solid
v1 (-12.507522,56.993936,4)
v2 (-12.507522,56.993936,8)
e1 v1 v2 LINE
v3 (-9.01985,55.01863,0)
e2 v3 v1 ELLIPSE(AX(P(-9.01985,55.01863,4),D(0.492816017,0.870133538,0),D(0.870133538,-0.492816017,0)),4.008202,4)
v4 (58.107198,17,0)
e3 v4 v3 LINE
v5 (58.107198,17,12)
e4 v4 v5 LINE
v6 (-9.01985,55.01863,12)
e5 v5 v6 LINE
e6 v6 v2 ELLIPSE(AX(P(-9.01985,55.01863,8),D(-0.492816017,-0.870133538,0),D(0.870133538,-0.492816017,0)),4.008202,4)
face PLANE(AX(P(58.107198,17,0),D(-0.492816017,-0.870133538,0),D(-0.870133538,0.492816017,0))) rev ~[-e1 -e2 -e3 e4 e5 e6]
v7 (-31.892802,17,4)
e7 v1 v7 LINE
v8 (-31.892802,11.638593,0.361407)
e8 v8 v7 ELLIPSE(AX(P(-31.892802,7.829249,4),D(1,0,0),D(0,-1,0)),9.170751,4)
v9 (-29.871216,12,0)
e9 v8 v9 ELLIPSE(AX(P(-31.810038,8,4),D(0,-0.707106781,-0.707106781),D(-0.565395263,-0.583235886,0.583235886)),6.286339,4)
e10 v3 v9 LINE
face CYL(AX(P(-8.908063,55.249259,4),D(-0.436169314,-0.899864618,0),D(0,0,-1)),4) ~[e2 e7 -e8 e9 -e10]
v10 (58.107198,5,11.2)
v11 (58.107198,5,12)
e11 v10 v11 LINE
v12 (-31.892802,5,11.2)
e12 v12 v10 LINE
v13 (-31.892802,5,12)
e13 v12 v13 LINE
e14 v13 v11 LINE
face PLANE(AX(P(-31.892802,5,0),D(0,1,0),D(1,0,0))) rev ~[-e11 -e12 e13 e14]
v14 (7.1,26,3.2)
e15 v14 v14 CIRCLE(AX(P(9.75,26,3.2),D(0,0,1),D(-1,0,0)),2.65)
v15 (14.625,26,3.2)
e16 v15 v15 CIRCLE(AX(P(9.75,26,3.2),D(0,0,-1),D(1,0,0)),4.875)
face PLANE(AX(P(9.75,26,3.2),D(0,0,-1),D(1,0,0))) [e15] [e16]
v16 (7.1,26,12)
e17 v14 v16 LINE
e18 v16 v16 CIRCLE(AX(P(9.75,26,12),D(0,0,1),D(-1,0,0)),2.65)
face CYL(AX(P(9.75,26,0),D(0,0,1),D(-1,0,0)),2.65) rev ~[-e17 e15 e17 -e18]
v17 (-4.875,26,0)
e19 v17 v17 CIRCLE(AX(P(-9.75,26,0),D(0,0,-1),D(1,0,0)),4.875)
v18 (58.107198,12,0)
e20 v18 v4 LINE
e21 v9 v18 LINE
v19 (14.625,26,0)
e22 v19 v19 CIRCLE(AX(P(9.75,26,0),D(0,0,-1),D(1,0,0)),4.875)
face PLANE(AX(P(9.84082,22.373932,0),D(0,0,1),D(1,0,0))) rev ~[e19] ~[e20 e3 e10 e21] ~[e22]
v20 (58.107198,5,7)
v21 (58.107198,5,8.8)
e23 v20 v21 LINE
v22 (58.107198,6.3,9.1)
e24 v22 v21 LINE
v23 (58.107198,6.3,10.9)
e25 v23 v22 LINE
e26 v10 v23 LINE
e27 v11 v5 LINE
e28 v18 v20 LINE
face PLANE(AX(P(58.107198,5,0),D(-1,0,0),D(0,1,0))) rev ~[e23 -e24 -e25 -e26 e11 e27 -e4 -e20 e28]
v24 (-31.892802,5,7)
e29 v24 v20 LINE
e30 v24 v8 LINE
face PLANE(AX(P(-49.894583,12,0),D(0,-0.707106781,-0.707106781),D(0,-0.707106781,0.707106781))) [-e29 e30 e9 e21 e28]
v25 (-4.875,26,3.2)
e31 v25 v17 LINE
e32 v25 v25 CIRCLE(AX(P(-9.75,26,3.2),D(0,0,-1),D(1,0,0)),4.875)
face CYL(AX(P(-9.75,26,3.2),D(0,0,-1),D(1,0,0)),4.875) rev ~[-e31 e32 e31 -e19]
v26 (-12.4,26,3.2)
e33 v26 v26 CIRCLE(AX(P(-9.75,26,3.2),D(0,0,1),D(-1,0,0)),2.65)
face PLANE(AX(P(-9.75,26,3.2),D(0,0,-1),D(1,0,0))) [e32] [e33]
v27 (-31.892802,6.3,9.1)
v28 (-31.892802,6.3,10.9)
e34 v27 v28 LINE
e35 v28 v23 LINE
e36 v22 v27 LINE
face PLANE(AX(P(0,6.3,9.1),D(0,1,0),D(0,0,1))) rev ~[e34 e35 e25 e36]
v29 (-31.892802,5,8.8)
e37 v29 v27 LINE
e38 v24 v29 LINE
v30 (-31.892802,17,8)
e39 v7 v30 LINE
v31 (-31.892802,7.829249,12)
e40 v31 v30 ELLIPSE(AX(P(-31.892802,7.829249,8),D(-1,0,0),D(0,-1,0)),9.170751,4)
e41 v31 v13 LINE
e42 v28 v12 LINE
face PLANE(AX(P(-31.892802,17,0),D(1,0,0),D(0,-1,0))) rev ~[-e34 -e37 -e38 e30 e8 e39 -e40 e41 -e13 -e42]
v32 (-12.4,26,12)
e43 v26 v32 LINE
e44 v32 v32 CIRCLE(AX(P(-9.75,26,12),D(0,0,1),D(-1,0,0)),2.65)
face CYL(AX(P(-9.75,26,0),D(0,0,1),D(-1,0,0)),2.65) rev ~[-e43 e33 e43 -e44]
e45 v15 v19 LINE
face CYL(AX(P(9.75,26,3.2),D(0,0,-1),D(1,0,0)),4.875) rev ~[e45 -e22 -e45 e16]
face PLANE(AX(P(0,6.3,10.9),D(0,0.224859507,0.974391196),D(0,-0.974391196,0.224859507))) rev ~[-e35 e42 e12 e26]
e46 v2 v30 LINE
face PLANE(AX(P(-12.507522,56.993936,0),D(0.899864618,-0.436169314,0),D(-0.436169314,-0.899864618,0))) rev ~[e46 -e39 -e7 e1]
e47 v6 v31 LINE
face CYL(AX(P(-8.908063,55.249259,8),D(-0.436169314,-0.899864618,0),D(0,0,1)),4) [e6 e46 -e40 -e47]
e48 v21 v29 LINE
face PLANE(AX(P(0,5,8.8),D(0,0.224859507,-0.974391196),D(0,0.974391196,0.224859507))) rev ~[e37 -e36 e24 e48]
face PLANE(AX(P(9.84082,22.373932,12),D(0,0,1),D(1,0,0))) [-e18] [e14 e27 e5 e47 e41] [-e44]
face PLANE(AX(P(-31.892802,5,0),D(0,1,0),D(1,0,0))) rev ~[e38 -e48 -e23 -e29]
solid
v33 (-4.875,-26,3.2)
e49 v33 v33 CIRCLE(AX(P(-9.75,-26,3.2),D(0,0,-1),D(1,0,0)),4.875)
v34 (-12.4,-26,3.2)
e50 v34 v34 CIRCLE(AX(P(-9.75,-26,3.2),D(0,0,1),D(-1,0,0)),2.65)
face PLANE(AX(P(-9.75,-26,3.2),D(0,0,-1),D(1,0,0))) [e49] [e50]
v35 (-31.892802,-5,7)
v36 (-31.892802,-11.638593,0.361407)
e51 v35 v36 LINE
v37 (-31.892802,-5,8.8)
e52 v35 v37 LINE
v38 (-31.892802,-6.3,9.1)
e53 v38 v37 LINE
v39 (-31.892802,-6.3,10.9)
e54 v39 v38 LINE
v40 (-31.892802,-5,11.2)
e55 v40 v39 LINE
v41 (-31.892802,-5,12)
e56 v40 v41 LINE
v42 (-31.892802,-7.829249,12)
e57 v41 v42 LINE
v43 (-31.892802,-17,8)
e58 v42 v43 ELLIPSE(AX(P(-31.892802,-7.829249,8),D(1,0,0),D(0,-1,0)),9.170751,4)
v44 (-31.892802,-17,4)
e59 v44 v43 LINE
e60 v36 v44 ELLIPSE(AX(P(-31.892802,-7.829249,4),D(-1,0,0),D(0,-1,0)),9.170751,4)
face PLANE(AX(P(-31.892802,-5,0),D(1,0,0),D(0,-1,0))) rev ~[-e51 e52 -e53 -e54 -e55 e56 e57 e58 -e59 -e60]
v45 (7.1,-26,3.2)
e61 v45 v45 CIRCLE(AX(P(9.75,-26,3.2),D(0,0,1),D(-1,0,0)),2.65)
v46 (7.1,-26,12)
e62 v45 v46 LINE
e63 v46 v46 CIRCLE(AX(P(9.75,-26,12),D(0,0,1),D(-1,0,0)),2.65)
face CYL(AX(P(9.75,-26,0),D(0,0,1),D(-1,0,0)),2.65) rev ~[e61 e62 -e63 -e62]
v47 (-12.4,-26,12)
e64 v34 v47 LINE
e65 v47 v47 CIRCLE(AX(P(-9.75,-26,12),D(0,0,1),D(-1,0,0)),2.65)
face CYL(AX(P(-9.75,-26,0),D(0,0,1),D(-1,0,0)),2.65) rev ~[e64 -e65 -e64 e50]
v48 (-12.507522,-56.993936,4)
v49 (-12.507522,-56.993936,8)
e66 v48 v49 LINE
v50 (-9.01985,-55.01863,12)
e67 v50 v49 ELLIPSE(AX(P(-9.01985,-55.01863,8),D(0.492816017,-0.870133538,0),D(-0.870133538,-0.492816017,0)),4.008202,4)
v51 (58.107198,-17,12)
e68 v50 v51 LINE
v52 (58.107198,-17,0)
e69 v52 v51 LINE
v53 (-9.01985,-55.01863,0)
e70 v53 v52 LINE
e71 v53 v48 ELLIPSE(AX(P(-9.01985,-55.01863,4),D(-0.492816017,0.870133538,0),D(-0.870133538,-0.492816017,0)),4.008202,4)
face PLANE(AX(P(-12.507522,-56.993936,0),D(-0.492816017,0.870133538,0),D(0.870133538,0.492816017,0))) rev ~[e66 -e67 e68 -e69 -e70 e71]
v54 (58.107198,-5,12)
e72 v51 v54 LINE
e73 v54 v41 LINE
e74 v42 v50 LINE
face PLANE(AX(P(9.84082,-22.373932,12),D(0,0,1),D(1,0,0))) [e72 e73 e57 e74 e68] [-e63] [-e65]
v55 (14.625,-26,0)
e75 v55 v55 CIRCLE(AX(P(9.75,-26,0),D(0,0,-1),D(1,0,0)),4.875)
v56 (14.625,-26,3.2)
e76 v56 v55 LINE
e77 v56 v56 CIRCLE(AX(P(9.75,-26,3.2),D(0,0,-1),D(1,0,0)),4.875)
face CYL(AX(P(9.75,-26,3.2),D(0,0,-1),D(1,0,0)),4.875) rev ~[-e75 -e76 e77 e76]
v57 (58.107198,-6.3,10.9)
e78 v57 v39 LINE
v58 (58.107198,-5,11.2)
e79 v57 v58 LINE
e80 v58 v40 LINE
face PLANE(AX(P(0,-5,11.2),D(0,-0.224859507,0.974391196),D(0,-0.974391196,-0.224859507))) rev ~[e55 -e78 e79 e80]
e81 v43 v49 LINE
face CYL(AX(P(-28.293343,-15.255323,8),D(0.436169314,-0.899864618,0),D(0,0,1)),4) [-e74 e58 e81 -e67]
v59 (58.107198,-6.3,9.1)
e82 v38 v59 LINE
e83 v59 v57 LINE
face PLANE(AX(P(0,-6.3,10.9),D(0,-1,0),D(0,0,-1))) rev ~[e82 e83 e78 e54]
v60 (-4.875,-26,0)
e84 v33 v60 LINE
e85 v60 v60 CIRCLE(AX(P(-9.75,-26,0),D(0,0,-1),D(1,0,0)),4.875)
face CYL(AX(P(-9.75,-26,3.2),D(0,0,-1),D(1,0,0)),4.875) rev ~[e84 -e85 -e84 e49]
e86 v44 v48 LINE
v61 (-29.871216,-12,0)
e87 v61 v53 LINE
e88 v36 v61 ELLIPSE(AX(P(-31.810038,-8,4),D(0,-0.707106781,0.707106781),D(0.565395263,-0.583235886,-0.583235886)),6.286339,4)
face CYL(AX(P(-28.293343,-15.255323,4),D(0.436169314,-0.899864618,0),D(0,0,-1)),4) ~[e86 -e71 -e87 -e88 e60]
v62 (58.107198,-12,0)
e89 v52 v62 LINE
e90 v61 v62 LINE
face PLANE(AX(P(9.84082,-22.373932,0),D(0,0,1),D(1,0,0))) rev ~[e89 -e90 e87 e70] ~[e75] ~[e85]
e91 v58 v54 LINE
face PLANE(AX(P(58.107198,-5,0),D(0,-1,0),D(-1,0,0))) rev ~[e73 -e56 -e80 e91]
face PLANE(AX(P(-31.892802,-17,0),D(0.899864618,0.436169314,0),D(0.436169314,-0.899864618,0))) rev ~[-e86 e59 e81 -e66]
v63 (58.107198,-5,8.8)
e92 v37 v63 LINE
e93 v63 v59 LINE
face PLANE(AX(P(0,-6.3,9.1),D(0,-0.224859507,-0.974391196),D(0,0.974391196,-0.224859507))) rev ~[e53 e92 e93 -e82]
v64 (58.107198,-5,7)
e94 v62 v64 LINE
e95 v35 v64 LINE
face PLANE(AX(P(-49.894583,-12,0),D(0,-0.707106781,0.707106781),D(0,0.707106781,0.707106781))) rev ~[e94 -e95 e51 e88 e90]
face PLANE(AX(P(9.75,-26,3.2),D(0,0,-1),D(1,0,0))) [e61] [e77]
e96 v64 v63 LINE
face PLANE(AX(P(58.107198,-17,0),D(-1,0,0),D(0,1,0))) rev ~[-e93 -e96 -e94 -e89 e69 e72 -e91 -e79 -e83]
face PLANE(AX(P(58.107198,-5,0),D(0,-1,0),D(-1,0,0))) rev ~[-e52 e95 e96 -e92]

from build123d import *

# Parameters (mm, degrees)
F2_DEPTH         = 12
F3_D             = 5.3
F3_CBORE_D       = 9.75
F3_CBORE_DEPTH   = 3.2
F3_2_D           = 5.3
F3_2_CBORE_D     = 9.75
F3_2_CBORE_DEPTH = 3.2
F5_DEPTH         = 58.1081982567
F5_DEPTH_BACK    = 31.8938017433
F6_R             = 4
F6_2_R           = 4
F7_T1_DEPTH      = 126.0035618315
F7_2_T1_DEPTH    = 126.0035618315


# Not quite as in the source:
# - a fillet or chamfer that OpenCascade refuses, or shapes differently, is made with other operations: its cross-section is extruded or revolved along the edge and cut away or added
# - a feature names something its author has since deleted; it is built from what else it names


with BuildPart() as f2:
    # F1 (on Top) → F2 (new body)
    with BuildSketch(Plane.XY):
        Polygon((-31.8928017433, 17), (-31.8928017433, 5), (58.1071982567, 5), (58.1071982567, 17), (-12.5075216938, 56.9939360137), align=None)
    extrude(amount=F2_DEPTH)

    # F3 (through all)
    with Locations(Plane(origin=(0, 0, 0), x_dir=(1, 0, 0), z_dir=(0, 0, -1))):
        with Locations((-9.75, -26), (9.75, -26), (-9.75, 26), (9.75, 26)):
            CounterBoreHole(F3_D / 2, F3_CBORE_D / 2, F3_CBORE_DEPTH)


with BuildPart() as f2b:
    # F1 (on Top) → F2, piece 2 (new body)
    with BuildSketch(Plane.XY):
        Polygon((58.1071982567, -17), (58.1071982567, -5), (-31.8928017433, -5), (-31.8928017433, -17), (-12.5075216938, -56.9939360137), align=None)
    extrude(amount=F2_DEPTH)

    # F3#2 (through all)
    with Locations(Plane(origin=(0, 0, 0), x_dir=(1, 0, 0), z_dir=(0, 0, -1))):
        with Locations((-9.75, -26), (9.75, -26), (-9.75, 26), (9.75, 26)):
            CounterBoreHole(F3_2_D / 2, F3_2_CBORE_D / 2, F3_2_CBORE_DEPTH)


with BuildPart() as f5_tool:
    # F4 (on Right) → F5 (new body, two sides)
    with BuildSketch(Plane.YZ) as f5_sk:
        Polygon((-6.3, 10.9), (-6.3, 9.1), (-5, 8.8), (-5, 11.2), align=None)
        Polygon((6.3, 9.1), (6.3, 10.9), (5, 11.2), (5, 8.8), align=None)
    extrude(amount=F5_DEPTH)
    extrude(f5_sk.sketch, amount=-F5_DEPTH_BACK)


with BuildPart() as f2_1:
    add(f2.part)

    # F5: cut by f5_tool
    add(f5_tool.part, mode=Mode.SUBTRACT)

    # F6
    f6_edges = [f2_1.edges().sort_by_distance(p)[0] for p in [
        (-22.200162, 36.996968, 12),
        (-22.200162, 36.996968, 0),
    ]]
    fillet(f6_edges, radius=F6_R)

    # F7: chamfer of 7 on 1 edges, made by hand

    # F7_s2 → F7_t1 (cut)
    with BuildSketch(Plane.YZ.offset(-49.894582659)):
        Polygon((12, 0), (5, 7), (5, 0), align=None)
    extrude(amount=F7_T1_DEPTH, mode=Mode.SUBTRACT)


with BuildPart() as f2b_1:
    add(f2b.part)

    # F5: cut by f5_tool
    add(f5_tool.part, mode=Mode.SUBTRACT)

    # F6#2
    f6_2_edges = [f2b_1.edges().sort_by_distance(p)[0] for p in [
        (-22.200162, -36.996968, 0),
        (-22.200162, -36.996968, 12),
    ]]
    fillet(f6_2_edges, radius=F6_2_R)

    # F7#2: chamfer of 7 on 1 edges, made by hand

    # F7_2_s2 → F7_2_t1 (cut)
    with BuildSketch(Plane.YZ.offset(-49.894582659)):
        Polygon((-12, 0), (-5, 7), (-5, 0), align=None)
    extrude(amount=F7_2_T1_DEPTH, mode=Mode.SUBTRACT)


solid = Compound([f2_1.part, f2b_1.part])
